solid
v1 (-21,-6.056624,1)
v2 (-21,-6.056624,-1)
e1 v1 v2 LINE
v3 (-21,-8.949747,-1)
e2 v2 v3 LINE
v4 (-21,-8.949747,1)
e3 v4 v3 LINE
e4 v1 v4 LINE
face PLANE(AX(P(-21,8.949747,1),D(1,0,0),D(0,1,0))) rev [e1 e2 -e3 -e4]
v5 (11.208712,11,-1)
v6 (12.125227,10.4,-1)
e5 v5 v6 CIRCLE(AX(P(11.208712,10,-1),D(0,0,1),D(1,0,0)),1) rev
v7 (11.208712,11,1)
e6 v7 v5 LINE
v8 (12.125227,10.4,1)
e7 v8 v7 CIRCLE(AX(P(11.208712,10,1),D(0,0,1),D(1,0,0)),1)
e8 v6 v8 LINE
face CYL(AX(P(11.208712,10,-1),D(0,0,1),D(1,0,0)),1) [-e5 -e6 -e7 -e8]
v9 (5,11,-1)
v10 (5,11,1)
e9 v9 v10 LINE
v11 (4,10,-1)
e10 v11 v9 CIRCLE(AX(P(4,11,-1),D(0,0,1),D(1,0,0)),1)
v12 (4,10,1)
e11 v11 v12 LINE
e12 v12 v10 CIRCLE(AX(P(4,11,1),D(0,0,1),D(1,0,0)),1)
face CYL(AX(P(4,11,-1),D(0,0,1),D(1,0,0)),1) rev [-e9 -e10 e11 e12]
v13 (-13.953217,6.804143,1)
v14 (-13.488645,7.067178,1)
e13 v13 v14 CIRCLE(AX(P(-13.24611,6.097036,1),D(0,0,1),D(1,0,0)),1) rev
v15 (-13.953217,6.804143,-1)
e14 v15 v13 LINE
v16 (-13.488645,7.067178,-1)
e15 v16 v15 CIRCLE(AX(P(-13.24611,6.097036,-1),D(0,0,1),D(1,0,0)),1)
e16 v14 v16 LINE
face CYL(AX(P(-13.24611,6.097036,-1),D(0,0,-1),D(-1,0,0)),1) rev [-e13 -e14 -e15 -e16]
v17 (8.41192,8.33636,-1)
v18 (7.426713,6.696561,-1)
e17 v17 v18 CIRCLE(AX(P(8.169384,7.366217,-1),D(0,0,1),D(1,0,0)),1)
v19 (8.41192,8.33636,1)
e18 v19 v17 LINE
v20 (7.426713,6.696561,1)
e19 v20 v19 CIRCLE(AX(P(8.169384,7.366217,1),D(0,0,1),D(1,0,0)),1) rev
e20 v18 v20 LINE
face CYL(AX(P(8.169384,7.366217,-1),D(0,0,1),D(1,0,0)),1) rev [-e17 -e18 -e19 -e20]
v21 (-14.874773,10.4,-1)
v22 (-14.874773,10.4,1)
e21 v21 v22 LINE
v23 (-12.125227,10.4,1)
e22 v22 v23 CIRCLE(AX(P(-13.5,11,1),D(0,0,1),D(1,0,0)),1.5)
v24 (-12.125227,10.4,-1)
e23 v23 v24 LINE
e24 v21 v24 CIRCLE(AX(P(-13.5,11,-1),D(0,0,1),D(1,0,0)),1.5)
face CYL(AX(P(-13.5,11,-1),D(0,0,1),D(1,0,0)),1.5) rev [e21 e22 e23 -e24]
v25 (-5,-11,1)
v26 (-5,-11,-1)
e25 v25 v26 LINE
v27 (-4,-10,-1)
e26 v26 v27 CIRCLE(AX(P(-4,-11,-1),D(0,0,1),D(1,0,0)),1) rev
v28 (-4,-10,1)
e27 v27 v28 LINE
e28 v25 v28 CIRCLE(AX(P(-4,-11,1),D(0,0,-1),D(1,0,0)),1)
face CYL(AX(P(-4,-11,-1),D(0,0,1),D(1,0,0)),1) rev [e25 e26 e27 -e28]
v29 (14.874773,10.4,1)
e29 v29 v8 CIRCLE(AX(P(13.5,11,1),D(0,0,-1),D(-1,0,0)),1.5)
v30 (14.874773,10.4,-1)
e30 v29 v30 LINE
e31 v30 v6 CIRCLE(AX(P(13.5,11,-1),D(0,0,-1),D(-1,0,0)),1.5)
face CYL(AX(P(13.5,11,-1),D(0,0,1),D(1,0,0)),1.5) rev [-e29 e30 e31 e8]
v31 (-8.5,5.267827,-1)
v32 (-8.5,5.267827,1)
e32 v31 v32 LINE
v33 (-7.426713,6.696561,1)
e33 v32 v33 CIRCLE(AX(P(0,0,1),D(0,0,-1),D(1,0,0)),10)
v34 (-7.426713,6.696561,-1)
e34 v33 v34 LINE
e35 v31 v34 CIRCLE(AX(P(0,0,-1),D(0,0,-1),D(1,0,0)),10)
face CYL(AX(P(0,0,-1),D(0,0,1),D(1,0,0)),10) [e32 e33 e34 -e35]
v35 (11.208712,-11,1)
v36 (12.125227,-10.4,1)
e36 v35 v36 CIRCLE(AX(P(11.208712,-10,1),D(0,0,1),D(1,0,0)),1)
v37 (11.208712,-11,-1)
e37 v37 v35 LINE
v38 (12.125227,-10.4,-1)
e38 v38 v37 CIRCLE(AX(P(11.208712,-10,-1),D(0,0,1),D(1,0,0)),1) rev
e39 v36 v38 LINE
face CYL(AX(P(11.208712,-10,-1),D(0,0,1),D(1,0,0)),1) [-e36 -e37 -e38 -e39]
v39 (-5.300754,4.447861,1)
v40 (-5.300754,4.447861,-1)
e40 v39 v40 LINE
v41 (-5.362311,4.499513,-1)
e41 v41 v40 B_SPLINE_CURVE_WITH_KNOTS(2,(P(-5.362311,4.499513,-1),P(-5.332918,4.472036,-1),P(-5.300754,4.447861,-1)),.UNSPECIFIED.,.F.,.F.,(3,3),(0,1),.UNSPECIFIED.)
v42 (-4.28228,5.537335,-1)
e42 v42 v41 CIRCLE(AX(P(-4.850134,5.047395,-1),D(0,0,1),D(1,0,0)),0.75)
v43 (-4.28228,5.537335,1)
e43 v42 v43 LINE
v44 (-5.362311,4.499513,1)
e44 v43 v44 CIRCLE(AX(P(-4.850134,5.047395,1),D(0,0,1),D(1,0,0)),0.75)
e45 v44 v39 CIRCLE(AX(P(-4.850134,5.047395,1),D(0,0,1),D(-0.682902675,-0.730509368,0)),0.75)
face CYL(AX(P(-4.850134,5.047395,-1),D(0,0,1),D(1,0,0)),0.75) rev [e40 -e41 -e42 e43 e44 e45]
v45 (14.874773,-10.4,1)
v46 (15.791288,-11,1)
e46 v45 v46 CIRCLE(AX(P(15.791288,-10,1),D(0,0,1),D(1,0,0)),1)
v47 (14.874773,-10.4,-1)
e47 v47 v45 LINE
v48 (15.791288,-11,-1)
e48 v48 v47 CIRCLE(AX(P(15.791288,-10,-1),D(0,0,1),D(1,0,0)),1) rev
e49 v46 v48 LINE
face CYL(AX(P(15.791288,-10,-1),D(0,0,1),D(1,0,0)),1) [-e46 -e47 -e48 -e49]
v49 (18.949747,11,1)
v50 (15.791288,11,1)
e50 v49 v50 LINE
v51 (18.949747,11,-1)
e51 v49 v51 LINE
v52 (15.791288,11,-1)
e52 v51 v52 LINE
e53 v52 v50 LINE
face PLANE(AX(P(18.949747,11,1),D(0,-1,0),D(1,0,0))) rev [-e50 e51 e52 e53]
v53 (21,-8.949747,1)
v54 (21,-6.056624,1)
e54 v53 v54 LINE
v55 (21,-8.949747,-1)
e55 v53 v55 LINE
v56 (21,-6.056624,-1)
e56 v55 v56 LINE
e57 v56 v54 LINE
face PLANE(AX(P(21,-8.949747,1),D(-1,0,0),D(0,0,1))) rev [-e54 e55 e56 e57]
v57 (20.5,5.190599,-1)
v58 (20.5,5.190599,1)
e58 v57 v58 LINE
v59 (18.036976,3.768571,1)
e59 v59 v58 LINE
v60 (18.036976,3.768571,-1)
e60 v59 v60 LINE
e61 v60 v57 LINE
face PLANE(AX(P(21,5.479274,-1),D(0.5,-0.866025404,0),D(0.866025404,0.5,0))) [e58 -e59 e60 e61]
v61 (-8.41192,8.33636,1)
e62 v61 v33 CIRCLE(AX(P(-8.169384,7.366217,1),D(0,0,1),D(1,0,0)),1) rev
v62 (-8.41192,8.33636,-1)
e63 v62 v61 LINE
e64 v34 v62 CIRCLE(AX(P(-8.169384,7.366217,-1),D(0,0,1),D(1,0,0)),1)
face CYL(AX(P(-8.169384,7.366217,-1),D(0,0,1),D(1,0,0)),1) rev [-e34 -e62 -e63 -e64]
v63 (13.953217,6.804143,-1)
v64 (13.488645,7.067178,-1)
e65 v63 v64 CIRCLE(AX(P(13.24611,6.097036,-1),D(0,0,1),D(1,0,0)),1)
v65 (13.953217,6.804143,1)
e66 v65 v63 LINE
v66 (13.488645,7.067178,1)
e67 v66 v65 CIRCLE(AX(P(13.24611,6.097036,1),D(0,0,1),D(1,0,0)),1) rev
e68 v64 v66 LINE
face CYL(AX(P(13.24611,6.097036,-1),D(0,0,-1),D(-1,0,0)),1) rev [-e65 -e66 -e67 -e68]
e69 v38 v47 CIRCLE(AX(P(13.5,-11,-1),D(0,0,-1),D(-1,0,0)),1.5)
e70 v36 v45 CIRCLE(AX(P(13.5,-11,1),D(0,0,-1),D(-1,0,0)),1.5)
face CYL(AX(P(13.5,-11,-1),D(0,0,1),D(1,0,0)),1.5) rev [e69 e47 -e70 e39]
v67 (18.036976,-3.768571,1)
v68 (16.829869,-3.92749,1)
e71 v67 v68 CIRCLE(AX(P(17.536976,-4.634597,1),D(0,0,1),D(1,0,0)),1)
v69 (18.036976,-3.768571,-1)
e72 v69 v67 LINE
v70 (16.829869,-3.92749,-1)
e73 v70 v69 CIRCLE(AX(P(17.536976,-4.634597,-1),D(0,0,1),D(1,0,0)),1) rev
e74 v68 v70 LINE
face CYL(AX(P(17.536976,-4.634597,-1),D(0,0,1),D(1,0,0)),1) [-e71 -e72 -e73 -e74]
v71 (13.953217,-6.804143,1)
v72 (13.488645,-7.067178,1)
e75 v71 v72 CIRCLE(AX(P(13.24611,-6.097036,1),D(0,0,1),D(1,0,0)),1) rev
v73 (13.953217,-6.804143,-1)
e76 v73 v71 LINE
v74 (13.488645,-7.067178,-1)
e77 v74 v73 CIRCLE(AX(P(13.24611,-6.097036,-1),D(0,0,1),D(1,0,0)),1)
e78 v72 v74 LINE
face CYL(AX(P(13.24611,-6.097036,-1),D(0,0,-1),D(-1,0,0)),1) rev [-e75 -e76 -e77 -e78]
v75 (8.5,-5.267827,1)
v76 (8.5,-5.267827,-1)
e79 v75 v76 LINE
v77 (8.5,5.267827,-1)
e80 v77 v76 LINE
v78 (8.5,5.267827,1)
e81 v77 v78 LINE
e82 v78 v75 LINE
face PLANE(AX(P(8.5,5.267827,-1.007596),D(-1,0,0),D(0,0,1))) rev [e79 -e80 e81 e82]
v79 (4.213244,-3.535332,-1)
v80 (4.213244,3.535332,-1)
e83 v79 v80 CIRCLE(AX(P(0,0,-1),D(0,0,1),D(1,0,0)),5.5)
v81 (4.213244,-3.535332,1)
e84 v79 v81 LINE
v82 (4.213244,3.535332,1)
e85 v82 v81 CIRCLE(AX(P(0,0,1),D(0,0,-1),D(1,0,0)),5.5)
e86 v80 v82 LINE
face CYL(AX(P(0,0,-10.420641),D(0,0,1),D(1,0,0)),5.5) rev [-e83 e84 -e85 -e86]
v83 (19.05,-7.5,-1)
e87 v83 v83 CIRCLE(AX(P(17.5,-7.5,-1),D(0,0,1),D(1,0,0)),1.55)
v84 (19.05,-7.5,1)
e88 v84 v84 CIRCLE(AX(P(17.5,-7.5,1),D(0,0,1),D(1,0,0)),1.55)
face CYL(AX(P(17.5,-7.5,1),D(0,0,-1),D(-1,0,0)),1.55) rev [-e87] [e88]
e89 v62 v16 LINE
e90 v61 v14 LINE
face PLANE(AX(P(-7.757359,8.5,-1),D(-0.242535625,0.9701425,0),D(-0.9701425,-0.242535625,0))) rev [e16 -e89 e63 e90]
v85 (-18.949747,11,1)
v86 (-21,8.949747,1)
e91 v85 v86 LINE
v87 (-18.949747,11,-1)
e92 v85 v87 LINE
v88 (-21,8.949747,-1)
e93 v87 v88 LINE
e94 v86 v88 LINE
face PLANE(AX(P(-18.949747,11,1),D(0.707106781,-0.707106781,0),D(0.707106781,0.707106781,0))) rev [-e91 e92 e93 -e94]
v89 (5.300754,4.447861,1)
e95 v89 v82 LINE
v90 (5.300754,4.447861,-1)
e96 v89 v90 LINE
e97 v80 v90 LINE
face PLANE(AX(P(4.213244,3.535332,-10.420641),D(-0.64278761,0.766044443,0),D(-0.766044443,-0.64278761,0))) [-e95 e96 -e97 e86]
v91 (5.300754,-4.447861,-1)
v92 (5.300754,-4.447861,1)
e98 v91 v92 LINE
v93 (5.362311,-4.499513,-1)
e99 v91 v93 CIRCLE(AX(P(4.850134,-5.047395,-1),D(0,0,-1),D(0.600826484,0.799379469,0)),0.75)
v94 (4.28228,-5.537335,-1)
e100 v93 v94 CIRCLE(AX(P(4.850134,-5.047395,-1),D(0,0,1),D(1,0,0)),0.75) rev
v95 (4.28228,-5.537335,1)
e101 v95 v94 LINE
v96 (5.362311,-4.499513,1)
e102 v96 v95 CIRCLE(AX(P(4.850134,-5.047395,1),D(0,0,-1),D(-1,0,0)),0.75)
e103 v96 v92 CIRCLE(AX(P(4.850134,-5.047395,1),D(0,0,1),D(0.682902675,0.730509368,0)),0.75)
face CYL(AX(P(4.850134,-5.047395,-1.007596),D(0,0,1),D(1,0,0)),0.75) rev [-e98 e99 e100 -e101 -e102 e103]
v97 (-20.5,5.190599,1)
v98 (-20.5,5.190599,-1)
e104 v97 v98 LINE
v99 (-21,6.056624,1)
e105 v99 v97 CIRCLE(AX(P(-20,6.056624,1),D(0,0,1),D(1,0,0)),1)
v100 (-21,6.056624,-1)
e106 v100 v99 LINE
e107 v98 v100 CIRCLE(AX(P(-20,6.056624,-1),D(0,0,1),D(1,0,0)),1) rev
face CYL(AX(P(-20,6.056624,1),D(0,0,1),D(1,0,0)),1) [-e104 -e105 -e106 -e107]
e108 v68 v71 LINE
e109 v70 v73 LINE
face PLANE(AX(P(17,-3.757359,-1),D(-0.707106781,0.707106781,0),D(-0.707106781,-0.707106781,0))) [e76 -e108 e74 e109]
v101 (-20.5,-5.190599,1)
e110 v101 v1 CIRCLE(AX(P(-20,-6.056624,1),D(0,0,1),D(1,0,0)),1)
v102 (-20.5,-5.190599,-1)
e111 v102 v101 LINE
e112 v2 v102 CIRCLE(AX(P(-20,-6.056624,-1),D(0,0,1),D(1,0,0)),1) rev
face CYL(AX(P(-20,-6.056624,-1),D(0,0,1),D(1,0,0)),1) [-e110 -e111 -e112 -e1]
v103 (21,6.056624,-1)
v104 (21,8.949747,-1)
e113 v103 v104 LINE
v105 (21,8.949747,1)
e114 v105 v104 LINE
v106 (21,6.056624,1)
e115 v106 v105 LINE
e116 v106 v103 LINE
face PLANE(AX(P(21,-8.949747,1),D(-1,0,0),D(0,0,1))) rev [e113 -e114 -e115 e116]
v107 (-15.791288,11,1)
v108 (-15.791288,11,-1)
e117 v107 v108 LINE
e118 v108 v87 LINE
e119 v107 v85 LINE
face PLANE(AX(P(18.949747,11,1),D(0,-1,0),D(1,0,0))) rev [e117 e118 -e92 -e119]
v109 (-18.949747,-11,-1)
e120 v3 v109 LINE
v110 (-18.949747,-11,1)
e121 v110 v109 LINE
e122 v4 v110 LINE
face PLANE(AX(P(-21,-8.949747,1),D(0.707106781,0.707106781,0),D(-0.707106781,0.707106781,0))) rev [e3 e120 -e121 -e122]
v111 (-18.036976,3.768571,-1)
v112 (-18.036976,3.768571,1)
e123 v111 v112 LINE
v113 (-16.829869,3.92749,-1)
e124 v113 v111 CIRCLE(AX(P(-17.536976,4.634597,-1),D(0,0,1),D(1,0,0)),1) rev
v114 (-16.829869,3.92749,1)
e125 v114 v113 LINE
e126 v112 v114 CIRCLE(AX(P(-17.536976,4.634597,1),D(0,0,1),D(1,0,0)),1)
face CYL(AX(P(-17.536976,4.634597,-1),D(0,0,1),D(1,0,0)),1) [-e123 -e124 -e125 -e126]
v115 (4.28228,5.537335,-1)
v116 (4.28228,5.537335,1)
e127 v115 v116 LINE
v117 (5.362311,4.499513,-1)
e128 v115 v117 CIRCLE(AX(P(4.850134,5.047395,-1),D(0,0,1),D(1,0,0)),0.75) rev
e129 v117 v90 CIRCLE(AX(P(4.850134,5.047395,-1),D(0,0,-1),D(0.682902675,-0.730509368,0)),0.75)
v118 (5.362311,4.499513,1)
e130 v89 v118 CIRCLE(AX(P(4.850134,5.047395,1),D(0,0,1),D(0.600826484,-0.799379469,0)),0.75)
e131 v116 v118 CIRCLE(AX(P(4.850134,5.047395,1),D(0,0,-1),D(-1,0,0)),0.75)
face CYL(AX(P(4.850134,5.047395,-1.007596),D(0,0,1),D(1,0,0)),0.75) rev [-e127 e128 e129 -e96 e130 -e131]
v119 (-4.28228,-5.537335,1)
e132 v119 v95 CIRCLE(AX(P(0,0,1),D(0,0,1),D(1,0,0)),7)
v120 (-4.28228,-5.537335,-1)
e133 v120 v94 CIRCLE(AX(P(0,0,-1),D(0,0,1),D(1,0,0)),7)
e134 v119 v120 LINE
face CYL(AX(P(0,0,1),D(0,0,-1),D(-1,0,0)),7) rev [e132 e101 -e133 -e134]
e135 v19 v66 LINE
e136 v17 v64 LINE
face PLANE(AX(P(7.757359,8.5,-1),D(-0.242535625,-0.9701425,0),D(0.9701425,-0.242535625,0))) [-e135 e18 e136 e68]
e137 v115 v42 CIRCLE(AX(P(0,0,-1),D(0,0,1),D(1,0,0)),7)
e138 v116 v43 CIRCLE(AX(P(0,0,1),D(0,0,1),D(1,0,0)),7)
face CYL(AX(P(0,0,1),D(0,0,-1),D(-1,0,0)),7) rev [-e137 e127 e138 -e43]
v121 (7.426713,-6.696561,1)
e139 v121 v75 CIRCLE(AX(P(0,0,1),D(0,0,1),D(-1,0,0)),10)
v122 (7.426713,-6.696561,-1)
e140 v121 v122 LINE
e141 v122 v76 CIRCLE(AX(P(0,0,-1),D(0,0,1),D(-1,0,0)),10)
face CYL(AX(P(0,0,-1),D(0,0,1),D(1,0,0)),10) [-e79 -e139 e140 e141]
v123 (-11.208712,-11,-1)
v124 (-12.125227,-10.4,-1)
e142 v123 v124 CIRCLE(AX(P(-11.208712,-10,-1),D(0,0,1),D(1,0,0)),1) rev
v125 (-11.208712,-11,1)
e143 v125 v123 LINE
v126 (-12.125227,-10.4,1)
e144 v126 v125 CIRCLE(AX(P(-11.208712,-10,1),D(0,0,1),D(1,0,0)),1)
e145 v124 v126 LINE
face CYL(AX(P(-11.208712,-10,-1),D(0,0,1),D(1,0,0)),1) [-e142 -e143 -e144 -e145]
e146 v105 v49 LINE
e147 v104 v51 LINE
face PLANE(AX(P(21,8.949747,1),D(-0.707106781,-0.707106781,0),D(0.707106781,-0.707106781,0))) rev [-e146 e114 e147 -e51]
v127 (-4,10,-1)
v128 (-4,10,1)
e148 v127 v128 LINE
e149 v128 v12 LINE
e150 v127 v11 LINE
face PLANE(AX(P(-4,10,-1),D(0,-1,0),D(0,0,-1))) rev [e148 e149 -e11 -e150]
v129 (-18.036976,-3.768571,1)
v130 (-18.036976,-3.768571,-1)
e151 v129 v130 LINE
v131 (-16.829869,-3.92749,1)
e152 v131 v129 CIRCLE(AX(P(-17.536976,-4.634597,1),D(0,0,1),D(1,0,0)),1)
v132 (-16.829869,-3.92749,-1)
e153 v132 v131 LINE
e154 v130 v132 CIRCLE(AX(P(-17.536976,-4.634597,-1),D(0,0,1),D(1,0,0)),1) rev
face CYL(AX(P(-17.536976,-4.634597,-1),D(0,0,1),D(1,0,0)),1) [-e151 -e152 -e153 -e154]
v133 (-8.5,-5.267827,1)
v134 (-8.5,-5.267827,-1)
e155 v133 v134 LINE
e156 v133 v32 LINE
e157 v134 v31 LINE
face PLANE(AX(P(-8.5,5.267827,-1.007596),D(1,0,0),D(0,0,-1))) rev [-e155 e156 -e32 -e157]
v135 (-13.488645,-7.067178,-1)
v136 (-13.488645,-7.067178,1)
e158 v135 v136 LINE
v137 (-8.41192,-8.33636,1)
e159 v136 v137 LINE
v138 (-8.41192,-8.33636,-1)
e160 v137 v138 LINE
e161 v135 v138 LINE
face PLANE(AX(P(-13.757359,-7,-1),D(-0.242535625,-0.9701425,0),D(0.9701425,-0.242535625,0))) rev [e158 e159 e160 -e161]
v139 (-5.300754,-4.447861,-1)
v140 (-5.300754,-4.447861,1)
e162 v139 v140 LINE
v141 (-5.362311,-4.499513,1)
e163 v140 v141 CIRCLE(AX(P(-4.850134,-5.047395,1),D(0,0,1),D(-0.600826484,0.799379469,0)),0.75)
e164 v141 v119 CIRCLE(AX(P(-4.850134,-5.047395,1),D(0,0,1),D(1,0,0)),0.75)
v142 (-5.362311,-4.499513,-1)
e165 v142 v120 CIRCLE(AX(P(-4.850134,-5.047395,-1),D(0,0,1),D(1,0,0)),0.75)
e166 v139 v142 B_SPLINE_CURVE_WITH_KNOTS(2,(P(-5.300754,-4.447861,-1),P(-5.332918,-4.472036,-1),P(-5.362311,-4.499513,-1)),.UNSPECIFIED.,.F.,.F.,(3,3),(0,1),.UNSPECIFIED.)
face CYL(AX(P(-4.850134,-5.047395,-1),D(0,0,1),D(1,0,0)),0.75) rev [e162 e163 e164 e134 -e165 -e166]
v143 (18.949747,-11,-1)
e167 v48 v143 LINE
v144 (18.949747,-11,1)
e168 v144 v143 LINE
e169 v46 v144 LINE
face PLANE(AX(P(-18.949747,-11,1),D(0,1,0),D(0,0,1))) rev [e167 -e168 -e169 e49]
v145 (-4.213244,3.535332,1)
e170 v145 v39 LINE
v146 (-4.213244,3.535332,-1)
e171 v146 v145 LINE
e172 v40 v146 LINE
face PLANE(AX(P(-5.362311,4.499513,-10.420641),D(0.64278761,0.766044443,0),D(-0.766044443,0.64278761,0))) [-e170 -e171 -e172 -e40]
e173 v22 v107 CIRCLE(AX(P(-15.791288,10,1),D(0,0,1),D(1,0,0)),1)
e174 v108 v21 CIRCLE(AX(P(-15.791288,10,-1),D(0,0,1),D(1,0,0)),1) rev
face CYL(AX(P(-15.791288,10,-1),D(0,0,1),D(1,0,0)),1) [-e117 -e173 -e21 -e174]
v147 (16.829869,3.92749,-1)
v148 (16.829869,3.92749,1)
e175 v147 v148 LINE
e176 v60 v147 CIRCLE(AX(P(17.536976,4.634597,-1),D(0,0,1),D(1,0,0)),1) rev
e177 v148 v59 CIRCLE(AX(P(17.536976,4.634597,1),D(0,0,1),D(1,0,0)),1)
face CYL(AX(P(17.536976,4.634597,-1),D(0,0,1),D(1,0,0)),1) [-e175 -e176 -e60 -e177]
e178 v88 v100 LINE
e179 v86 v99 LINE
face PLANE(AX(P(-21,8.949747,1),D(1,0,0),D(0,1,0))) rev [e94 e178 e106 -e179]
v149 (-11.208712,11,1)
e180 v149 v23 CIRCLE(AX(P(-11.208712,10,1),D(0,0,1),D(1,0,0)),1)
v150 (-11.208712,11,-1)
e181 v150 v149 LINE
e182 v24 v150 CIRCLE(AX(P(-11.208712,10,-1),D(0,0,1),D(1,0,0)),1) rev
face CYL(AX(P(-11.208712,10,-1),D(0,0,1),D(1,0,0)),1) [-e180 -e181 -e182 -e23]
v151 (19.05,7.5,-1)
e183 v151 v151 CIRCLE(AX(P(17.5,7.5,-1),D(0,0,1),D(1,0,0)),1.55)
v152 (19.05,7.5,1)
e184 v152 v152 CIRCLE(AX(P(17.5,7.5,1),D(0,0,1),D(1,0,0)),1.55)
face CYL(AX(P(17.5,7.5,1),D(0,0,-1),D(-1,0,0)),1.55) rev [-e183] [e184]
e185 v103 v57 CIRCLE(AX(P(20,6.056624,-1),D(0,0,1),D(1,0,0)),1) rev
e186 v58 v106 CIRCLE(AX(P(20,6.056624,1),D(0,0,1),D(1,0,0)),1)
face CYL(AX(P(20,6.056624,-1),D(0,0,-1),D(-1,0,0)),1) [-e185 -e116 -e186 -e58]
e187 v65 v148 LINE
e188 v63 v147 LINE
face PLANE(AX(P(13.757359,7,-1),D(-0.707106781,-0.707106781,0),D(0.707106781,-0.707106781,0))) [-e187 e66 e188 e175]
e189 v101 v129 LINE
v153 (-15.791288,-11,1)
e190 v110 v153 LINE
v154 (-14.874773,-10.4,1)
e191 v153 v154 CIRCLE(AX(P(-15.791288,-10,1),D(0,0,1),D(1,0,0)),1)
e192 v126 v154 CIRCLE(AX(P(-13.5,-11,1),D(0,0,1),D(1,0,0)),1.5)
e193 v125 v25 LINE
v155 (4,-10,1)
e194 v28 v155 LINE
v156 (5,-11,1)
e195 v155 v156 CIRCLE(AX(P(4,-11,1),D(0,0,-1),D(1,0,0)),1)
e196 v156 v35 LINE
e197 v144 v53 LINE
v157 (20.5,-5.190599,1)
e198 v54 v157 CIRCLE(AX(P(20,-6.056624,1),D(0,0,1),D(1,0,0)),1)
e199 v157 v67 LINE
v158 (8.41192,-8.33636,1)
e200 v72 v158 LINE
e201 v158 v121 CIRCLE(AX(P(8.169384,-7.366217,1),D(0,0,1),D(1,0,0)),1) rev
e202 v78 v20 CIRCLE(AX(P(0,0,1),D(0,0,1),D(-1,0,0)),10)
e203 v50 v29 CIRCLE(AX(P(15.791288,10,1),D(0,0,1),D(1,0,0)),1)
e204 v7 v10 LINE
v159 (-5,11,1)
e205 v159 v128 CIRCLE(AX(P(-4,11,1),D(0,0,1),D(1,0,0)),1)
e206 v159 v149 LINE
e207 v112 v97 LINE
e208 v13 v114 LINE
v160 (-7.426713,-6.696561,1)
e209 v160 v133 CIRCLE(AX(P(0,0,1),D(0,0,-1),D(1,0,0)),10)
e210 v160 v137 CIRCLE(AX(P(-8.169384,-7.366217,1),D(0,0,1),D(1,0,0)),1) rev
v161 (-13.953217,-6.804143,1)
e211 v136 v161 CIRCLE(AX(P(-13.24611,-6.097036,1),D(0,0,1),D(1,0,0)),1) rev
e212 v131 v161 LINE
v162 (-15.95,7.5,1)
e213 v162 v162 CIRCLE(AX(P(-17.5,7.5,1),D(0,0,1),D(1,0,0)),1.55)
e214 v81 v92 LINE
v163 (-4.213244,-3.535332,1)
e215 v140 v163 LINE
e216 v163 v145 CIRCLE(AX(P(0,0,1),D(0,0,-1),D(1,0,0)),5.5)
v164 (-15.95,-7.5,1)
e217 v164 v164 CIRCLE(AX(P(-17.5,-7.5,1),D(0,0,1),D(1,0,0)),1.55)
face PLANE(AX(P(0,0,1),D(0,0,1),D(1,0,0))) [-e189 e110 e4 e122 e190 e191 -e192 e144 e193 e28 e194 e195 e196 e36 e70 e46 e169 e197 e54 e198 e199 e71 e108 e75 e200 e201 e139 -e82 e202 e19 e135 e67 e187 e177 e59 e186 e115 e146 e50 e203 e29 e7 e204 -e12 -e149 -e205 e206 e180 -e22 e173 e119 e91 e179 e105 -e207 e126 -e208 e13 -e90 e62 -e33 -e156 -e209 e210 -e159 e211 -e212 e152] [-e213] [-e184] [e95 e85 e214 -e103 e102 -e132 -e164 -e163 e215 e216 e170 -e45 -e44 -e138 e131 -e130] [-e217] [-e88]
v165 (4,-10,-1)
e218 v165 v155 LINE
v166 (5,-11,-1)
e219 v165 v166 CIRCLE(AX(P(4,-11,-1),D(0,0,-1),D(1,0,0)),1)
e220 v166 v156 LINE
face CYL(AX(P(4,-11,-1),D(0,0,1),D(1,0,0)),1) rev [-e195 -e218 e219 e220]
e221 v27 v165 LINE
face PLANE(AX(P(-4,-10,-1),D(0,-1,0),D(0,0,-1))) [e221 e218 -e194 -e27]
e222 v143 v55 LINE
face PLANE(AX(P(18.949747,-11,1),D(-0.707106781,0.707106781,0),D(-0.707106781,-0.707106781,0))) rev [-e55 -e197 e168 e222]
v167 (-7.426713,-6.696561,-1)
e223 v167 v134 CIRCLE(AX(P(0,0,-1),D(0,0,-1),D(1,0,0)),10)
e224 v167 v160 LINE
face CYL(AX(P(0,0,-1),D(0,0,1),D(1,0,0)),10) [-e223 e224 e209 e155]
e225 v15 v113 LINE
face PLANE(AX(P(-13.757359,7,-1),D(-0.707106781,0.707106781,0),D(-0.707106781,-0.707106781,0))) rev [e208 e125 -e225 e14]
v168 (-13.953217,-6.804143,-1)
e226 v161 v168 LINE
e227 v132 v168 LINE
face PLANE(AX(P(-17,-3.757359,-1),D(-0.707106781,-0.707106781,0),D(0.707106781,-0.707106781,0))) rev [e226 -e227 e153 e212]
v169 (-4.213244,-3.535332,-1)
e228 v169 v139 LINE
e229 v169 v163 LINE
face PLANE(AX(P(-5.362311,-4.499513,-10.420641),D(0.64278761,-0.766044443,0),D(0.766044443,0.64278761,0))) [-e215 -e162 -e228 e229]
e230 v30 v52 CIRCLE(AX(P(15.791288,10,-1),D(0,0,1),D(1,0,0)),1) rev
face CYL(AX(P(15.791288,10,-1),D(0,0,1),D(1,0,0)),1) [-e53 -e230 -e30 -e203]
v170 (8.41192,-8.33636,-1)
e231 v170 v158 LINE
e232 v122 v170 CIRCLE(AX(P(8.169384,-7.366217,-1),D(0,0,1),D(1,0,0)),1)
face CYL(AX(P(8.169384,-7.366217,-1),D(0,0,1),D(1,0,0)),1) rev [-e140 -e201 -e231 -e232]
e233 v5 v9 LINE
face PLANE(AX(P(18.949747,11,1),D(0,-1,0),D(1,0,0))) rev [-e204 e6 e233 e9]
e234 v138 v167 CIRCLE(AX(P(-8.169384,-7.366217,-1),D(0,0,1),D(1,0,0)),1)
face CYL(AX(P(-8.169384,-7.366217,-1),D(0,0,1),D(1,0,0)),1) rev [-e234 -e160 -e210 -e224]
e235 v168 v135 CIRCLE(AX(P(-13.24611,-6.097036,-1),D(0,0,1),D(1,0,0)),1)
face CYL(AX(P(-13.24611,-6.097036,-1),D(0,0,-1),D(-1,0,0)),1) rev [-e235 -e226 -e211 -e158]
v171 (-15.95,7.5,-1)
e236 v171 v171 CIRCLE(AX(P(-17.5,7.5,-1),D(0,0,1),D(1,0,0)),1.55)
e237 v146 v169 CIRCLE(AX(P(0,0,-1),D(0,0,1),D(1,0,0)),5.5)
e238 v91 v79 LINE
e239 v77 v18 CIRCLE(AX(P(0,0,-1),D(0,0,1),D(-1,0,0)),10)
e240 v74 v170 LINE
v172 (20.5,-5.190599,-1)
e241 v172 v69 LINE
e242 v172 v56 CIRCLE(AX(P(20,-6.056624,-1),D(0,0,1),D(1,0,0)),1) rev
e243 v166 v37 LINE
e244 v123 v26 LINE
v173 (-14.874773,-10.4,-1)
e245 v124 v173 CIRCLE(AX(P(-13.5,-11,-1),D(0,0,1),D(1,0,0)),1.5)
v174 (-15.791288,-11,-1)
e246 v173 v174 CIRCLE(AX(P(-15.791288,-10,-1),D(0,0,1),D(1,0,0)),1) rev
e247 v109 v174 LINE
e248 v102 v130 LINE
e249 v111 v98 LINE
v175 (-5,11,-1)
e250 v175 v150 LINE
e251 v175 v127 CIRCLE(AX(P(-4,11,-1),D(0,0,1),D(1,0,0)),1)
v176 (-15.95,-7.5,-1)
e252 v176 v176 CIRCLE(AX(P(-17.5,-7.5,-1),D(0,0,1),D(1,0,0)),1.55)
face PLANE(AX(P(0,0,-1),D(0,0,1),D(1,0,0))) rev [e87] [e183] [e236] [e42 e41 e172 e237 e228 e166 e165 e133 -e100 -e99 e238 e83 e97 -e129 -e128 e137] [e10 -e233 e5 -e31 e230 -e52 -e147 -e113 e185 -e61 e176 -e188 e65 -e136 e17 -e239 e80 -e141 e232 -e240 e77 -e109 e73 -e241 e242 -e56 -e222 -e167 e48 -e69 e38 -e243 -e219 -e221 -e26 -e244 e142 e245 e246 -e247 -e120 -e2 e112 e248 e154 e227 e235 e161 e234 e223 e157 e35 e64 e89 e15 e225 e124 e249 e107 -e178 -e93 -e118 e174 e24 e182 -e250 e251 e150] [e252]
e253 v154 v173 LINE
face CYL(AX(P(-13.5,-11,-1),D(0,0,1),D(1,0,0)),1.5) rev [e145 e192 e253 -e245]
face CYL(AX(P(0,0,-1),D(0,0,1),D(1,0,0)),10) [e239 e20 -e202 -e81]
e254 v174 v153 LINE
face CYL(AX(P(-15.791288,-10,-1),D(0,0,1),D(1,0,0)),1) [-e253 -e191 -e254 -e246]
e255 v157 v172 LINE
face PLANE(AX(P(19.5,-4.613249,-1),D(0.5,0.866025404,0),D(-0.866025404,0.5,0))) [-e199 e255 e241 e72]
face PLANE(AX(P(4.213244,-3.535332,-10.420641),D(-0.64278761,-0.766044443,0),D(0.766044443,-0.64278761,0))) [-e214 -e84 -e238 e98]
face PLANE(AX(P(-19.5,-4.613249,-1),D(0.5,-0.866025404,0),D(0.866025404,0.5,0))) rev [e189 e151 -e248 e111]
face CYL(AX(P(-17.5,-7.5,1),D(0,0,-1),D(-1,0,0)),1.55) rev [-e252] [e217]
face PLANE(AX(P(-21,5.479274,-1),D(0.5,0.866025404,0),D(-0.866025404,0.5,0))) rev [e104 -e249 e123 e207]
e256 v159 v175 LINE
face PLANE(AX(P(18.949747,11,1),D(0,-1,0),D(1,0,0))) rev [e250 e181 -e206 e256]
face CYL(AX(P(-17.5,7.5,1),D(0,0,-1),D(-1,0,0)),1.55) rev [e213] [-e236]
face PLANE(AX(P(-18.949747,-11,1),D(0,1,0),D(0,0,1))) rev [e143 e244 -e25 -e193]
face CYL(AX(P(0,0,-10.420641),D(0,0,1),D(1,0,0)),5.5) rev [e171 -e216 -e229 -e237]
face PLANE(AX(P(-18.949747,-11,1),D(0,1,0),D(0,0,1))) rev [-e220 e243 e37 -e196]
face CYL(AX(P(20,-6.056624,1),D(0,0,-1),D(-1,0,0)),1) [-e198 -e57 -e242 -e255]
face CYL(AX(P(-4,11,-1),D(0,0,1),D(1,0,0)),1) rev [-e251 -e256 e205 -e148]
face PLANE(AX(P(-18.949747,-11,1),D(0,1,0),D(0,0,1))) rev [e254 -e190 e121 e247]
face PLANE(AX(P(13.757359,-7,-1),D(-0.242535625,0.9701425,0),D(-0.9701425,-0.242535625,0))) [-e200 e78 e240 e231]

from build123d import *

# Parameters (mm, degrees)
SKETCH_1_R             = 1.55
SKETCH_1_R_2           = 7
EXTRUDE_1_DEPTH        = 1
CUT_EXTRUDE_1_DEPTH    = 24.790754507
FILLET_1_R             = 1
SKETCH_3_R             = 1.5
CUT_EXTRUDE_2_DEPTH    = 24.790754507
FILLET_2_R             = 1
FILLET_1_OF_MIRROR_1_R = 1
FILLET_2_OF_MIRROR_1_R = 1
CUT_EXTRUDE_3_DEPTH    = 24.790754507
FILLET_3_R             = 1
EXTRUDE_START          = -2
EXTRUDE_2_DEPTH        = 2
SKETCH_6_R             = 0.75
CUT_EXTRUDE_4_DEPTH    = 24.790754507
CUT_EXTRUDE_5_DEPTH    = 24.790754507
CUT_EXTRUDE_6_DEPTH    = 24.790754507
FILLET_4_R             = 1


with BuildPart() as part:
    # 草图1 → 凸台-拉伸1 (new, symmetric)
    with BuildSketch(Plane.XY):
        Polygon((-21, 8.949747468), (-21, -8.949747468), (-18.949747468, -11), (18.949747468, -11), (21, -8.949747468), (21, 8.949747468), (18.949747468, 11), (-18.949747468, 11), align=None)
        with Locations((-17.5, 7.5)):
            Circle(SKETCH_1_R, mode=Mode.SUBTRACT)
        with Locations((-17.5, -7.5)):
            Circle(SKETCH_1_R, mode=Mode.SUBTRACT)
        with Locations((17.5, -7.5)):
            Circle(SKETCH_1_R, mode=Mode.SUBTRACT)
        with Locations((17.5, 7.5)):
            Circle(SKETCH_1_R, mode=Mode.SUBTRACT)
        Circle(SKETCH_1_R_2, mode=Mode.SUBTRACT)
    extrude(amount=EXTRUDE_1_DEPTH, both=True)

    # 草图2 → 切除-拉伸1 (cut, through all)
    with BuildSketch(Plane.XY.offset(1)):
        Polygon((-21, 5.479274058), (-19.5, 4.613248654), (-19.5, -4.613248654), (-21, -5.479274058), align=None)
        with BuildLine():
            Line((-17, 3.757359313), (-17, -3.757359313))
            Line((-17, -3.757359313), (-13.757359313, -7))
            Line((-13.757359313, -7), (-7.757359313, -8.5))
            Line((-7.757359313, -8.5), (-5.267826876, -8.5))
            ThreePointArc((-5.267826876, -8.5), (-10, 0), (-5.267826876, 8.5))
            Line((-5.267826876, 8.5), (-7.757359313, 8.5))
            Line((-7.757359313, 8.5), (-13.757359313, 7))
            Line((-13.757359313, 7), (-17, 3.757359313))
        make_face()
    cut_extrude_1 = extrude(amount=-CUT_EXTRUDE_1_DEPTH, mode=Mode.SUBTRACT)

    # 圆角1
    # the kernel refuses this fillet: 1 mm, written as the material it adds along each edge
    with BuildSketch(Plane(origin=(-19.5, 4.613248654, 1), x_dir=(-0.8660254037844358, 0.5000000000000049, 0), z_dir=(0, 0, -1))) as fillet_1_piece_1:
        with BuildLine():
            CenterArc((FILLET_1_R * 0.57735026919, -FILLET_1_R), FILLET_1_R, 90, 60)
            Line((-FILLET_1_R * 0.288675134595, -FILLET_1_R * 0.5), (-FILLET_1_R * 0.30599564267, -FILLET_1_R * 0.49))
            Line((-FILLET_1_R * 0.30599564267, -FILLET_1_R * 0.49), (-FILLET_1_R * 0.0115470053838, FILLET_1_R * 0.02))
            Line((-FILLET_1_R * 0.0115470053838, FILLET_1_R * 0.02), (FILLET_1_R * 0.57735026919, FILLET_1_R * 0.02))
            Line((FILLET_1_R * 0.57735026919, FILLET_1_R * 0.02), (FILLET_1_R * 0.57735026919, 0))
        make_face()
    extrude(amount=2)
    with BuildSketch(Plane(origin=(-19.5, -4.613248654, 1), x_dir=(-0.8660254037844358, -0.5000000000000049, 0), z_dir=(0, 0, -1))) as fillet_1_piece_2:
        with BuildLine():
            CenterArc((FILLET_1_R * 0.57735026919, FILLET_1_R), FILLET_1_R, 210, 60)
            Line((-FILLET_1_R * 0.288675134595, FILLET_1_R * 0.5), (-FILLET_1_R * 0.30599564267, FILLET_1_R * 0.49))
            Line((-FILLET_1_R * 0.30599564267, FILLET_1_R * 0.49), (-FILLET_1_R * 0.0115470053838, -FILLET_1_R * 0.02))
            Line((-FILLET_1_R * 0.0115470053838, -FILLET_1_R * 0.02), (FILLET_1_R * 0.57735026919, -FILLET_1_R * 0.02))
            Line((FILLET_1_R * 0.57735026919, -FILLET_1_R * 0.02), (FILLET_1_R * 0.57735026919, 0))
        make_face()
    extrude(amount=2)
    with BuildSketch(Plane(origin=(-5.267826876, -8.5, 1), x_dir=(-1, 0, 0), z_dir=(0, 0, -1))) as fillet_1_piece_3:
        with BuildLine():
            CenterArc((2.747285214, 0.966210901), FILLET_1_R, 136.773049556, 118.290188871)
            Line((2.01863866, 1.651100819), (2.004065729, 1.664798618))
            ThreePointArc((2.004065729, 1.664798618), (1.050711081, 0.774944785), (-0.010535654, 0.017))
            Line((-0.010535654, 0.017), (0, -0.02))
            ThreePointArc((0, -0.02), (1.244766218, -0.02), (2.484377381, -0.019324218))
            Line((2.484377381, -0.019324218), (2.489532436, 0))
        make_face()
    extrude(amount=2)
    with BuildSketch(Plane(origin=(-13.757359313, -7, 1), x_dir=(-0.7071067811865476, 0.7071067811865476, 0), z_dir=(0, 0, -1)), Plane(origin=(-13.757359313, 7, 1), x_dir=(0.9701425001453319, 0.24253562503633297, 0), z_dir=(0, 0, -1))) as fillet_1_piece_4:
        with BuildLine():
            CenterArc((FILLET_1_R * 0.276983964948, FILLET_1_R), FILLET_1_R, 239.036243468, 30.963756532)
            Line((-FILLET_1_R * 0.237511790479, FILLET_1_R * 0.142507074287), (-FILLET_1_R * 0.247801705588, FILLET_1_R * 0.125357215773))
            Line((-FILLET_1_R * 0.247801705588, FILLET_1_R * 0.125357215773), (-FILLET_1_R * 0.00553967929897, -FILLET_1_R * 0.02))
            Line((-FILLET_1_R * 0.00553967929897, -FILLET_1_R * 0.02), (FILLET_1_R * 0.276983964948, -FILLET_1_R * 0.02))
            Line((FILLET_1_R * 0.276983964948, -FILLET_1_R * 0.02), (FILLET_1_R * 0.276983964948, 0))
        make_face()
    extrude(amount=2)
    with BuildSketch(Plane(origin=(-17, -3.757359313, 1), x_dir=(0, 1, 0), z_dir=(0, 0, -1))) as fillet_1_piece_5:
        with BuildLine():
            CenterArc((FILLET_1_R * 0.414213562373, FILLET_1_R), FILLET_1_R, 225, 45)
            Line((-FILLET_1_R * 0.292893218813, FILLET_1_R * 0.292893218813), (-FILLET_1_R * 0.307035354437, FILLET_1_R * 0.27875108319))
            Line((-FILLET_1_R * 0.307035354437, FILLET_1_R * 0.27875108319), (-FILLET_1_R * 0.00828427124746, -FILLET_1_R * 0.02))
            Line((-FILLET_1_R * 0.00828427124746, -FILLET_1_R * 0.02), (FILLET_1_R * 0.414213562373, -FILLET_1_R * 0.02))
            Line((FILLET_1_R * 0.414213562373, -FILLET_1_R * 0.02), (FILLET_1_R * 0.414213562373, 0))
        make_face()
    extrude(amount=2)
    with BuildSketch(Plane(origin=(-17, 3.757359313, 1), x_dir=(0, -1, 0), z_dir=(0, 0, -1))) as fillet_1_piece_6:
        with BuildLine():
            CenterArc((FILLET_1_R * 0.414213562373, -FILLET_1_R), FILLET_1_R, 90, 45)
            Line((-FILLET_1_R * 0.292893218813, -FILLET_1_R * 0.292893218813), (-FILLET_1_R * 0.307035354437, -FILLET_1_R * 0.27875108319))
            Line((-FILLET_1_R * 0.307035354437, -FILLET_1_R * 0.27875108319), (-FILLET_1_R * 0.00828427124746, FILLET_1_R * 0.02))
            Line((-FILLET_1_R * 0.00828427124746, FILLET_1_R * 0.02), (FILLET_1_R * 0.414213562373, FILLET_1_R * 0.02))
            Line((FILLET_1_R * 0.414213562373, FILLET_1_R * 0.02), (FILLET_1_R * 0.414213562373, 0))
        make_face()
    extrude(amount=2)
    with BuildSketch(Plane(origin=(-5.267826876, 8.5, 1), x_dir=(-0.7740536287886277, -0.6331200358219264, 0), z_dir=(0, 0, -1))) as fillet_1_piece_7:
        with BuildLine():
            CenterArc((2.738273569, 0.991462259), FILLET_1_R, 144.217451659, 118.290188871)
            Line((1.927031616, 1.576172865), (1.910806777, 1.587867077))
            ThreePointArc((1.910806777, 1.587867077), (0.950853407, 0.803567505), (-0.012662401, 0.015481073))
            Line((-0.012662401, 0.015481073), (0.00260788, -0.019829245))
            ThreePointArc((0.00260788, -0.019829245), (1.303939795, 0.065377415), (2.60527171, -0.019829245))
            Line((2.60527171, -0.019829245), (2.60787959, 0))
        make_face()
    extrude(amount=2)

    # 草图3 → 切除-拉伸2 (cut, through all)
    with BuildSketch(Plane.XY.offset(1)):
        with Locations((-13.5, 11)):
            Circle(SKETCH_3_R)
        with Locations((-13.5, -11)):
            Circle(SKETCH_3_R)
    cut_extrude_2 = extrude(amount=-CUT_EXTRUDE_2_DEPTH, mode=Mode.SUBTRACT)

    # 圆角2
    fillet_2_edges = [part.edges().sort_by_distance(p)[0] for p in [
        (-15, 11, 0),
        (-12, 11, 0),
        (-12, -11, 0),
        (-15, -11, 0),
    ]]
    fillet(fillet_2_edges, radius=FILLET_2_R)

    # 镜向1: 切除-拉伸1, 切除-拉伸2 across plane
    add(cut_extrude_1.mirror(Plane(origin=(0, 0, 0), x_dir=(0, 0, 1), z_dir=(1, 0, 0))), mode=Mode.SUBTRACT)
    add(cut_extrude_2.mirror(Plane(origin=(0, 0, 0), x_dir=(0, 0, 1), z_dir=(1, 0, 0))), mode=Mode.SUBTRACT)

    # 圆角1 of 镜向1
    # the kernel refuses this fillet: 1 mm, written as the material it adds along each edge
    with BuildSketch(Plane(origin=(19.5, 4.613248654, 1), x_dir=(0.866025403784436, 0.5000000000000044, 0), z_dir=(0, 0, -1)), Plane(origin=(19.5, -4.613248654, 1), x_dir=(0, 1, 0), z_dir=(0, 0, -1))) as fillet_1_of_mirror_1_piece_1:
        with BuildLine():
            CenterArc((FILLET_1_OF_MIRROR_1_R * 0.57735026919, FILLET_1_OF_MIRROR_1_R), FILLET_1_OF_MIRROR_1_R, 210, 60)
            Line((-FILLET_1_OF_MIRROR_1_R * 0.288675134595, FILLET_1_OF_MIRROR_1_R * 0.5), (-FILLET_1_OF_MIRROR_1_R * 0.305995642671, FILLET_1_OF_MIRROR_1_R * 0.49))
            Line((-FILLET_1_OF_MIRROR_1_R * 0.305995642671, FILLET_1_OF_MIRROR_1_R * 0.49), (-FILLET_1_OF_MIRROR_1_R * 0.0115470053838, -FILLET_1_OF_MIRROR_1_R * 0.02))
            Line((-FILLET_1_OF_MIRROR_1_R * 0.0115470053838, -FILLET_1_OF_MIRROR_1_R * 0.02), (FILLET_1_OF_MIRROR_1_R * 0.57735026919, -FILLET_1_OF_MIRROR_1_R * 0.02))
            Line((FILLET_1_OF_MIRROR_1_R * 0.57735026919, -FILLET_1_OF_MIRROR_1_R * 0.02), (FILLET_1_OF_MIRROR_1_R * 0.57735026919, 0))
        make_face()
    extrude(amount=2)
    with BuildSketch(Plane(origin=(5.267826876, -8.5, 1), x_dir=(0.7740536287886277, 0.6331200358219264, 0), z_dir=(0, 0, -1))) as fillet_1_of_mirror_1_piece_2:
        with BuildLine():
            CenterArc((2.738273569, 0.991462259), FILLET_1_OF_MIRROR_1_R, 144.217451659, 118.290188871)
            Line((1.927031616, 1.576172865), (1.910806777, 1.587867077))
            ThreePointArc((1.910806777, 1.587867077), (0.950853407, 0.803567505), (-0.012662401, 0.015481073))
            Line((-0.012662401, 0.015481073), (0.00260788, -0.019829245))
            ThreePointArc((0.00260788, -0.019829245), (1.303939795, 0.065377415), (2.60527171, -0.019829245))
            Line((2.60527171, -0.019829245), (2.60787959, 0))
        make_face()
    extrude(amount=2)
    with BuildSketch(Plane(origin=(13.757359313, -7, 1), x_dir=(0.7071067811865476, 0.7071067811865476, 0), z_dir=(0, 0, -1))) as fillet_1_of_mirror_1_piece_3:
        with BuildLine():
            CenterArc((FILLET_1_OF_MIRROR_1_R * 0.276983964948, -FILLET_1_OF_MIRROR_1_R), FILLET_1_OF_MIRROR_1_R, 90, 30.963756532)
            Line((-FILLET_1_OF_MIRROR_1_R * 0.237511790479, -FILLET_1_OF_MIRROR_1_R * 0.142507074287), (-FILLET_1_OF_MIRROR_1_R * 0.247801705588, -FILLET_1_OF_MIRROR_1_R * 0.125357215773))
            Line((-FILLET_1_OF_MIRROR_1_R * 0.247801705588, -FILLET_1_OF_MIRROR_1_R * 0.125357215773), (-FILLET_1_OF_MIRROR_1_R * 0.00553967929897, FILLET_1_OF_MIRROR_1_R * 0.02))
            Line((-FILLET_1_OF_MIRROR_1_R * 0.00553967929897, FILLET_1_OF_MIRROR_1_R * 0.02), (FILLET_1_OF_MIRROR_1_R * 0.276983964948, FILLET_1_OF_MIRROR_1_R * 0.02))
            Line((FILLET_1_OF_MIRROR_1_R * 0.276983964948, FILLET_1_OF_MIRROR_1_R * 0.02), (FILLET_1_OF_MIRROR_1_R * 0.276983964948, 0))
        make_face()
    extrude(amount=2)
    with BuildSketch(Plane(origin=(17, -3.757359313, 1), x_dir=(0, 1, 0), z_dir=(0, 0, -1)), Plane(origin=(17, 3.757359313, 1), x_dir=(-0.7071067811865465, 0.7071067811865486, 0), z_dir=(0, 0, -1))) as fillet_1_of_mirror_1_piece_4:
        with BuildLine():
            CenterArc((FILLET_1_OF_MIRROR_1_R * 0.414213562373, -FILLET_1_OF_MIRROR_1_R), FILLET_1_OF_MIRROR_1_R, 90, 45)
            Line((-FILLET_1_OF_MIRROR_1_R * 0.292893218813, -FILLET_1_OF_MIRROR_1_R * 0.292893218813), (-FILLET_1_OF_MIRROR_1_R * 0.307035354437, -FILLET_1_OF_MIRROR_1_R * 0.27875108319))
            Line((-FILLET_1_OF_MIRROR_1_R * 0.307035354437, -FILLET_1_OF_MIRROR_1_R * 0.27875108319), (-FILLET_1_OF_MIRROR_1_R * 0.00828427124746, FILLET_1_OF_MIRROR_1_R * 0.02))
            Line((-FILLET_1_OF_MIRROR_1_R * 0.00828427124746, FILLET_1_OF_MIRROR_1_R * 0.02), (FILLET_1_OF_MIRROR_1_R * 0.414213562373, FILLET_1_OF_MIRROR_1_R * 0.02))
            Line((FILLET_1_OF_MIRROR_1_R * 0.414213562373, FILLET_1_OF_MIRROR_1_R * 0.02), (FILLET_1_OF_MIRROR_1_R * 0.414213562373, 0))
        make_face()
    extrude(amount=2)
    with BuildSketch(Plane(origin=(13.757359313, 7, 1), x_dir=(0.7071067811865491, -0.7071067811865459, 0), z_dir=(0, 0, -1))) as fillet_1_of_mirror_1_piece_5:
        with BuildLine():
            CenterArc((FILLET_1_OF_MIRROR_1_R * 0.276983964948, FILLET_1_OF_MIRROR_1_R), FILLET_1_OF_MIRROR_1_R, 239.036243468, 30.963756532)
            Line((-FILLET_1_OF_MIRROR_1_R * 0.237511790479, FILLET_1_OF_MIRROR_1_R * 0.142507074287), (-FILLET_1_OF_MIRROR_1_R * 0.247801705588, FILLET_1_OF_MIRROR_1_R * 0.125357215773))
            Line((-FILLET_1_OF_MIRROR_1_R * 0.247801705588, FILLET_1_OF_MIRROR_1_R * 0.125357215773), (-FILLET_1_OF_MIRROR_1_R * 0.00553967929897, -FILLET_1_OF_MIRROR_1_R * 0.02))
            Line((-FILLET_1_OF_MIRROR_1_R * 0.00553967929897, -FILLET_1_OF_MIRROR_1_R * 0.02), (FILLET_1_OF_MIRROR_1_R * 0.276983964948, -FILLET_1_OF_MIRROR_1_R * 0.02))
            Line((FILLET_1_OF_MIRROR_1_R * 0.276983964948, -FILLET_1_OF_MIRROR_1_R * 0.02), (FILLET_1_OF_MIRROR_1_R * 0.276983964948, 0))
        make_face()
    extrude(amount=2)
    with BuildSketch(Plane(origin=(5.267826876, 8.5, 1), x_dir=(1, 0, 0), z_dir=(0, 0, -1))) as fillet_1_of_mirror_1_piece_6:
        with BuildLine():
            CenterArc((2.747285214, 0.966210901), FILLET_1_OF_MIRROR_1_R, 136.773049556, 118.290188871)
            Line((2.01863866, 1.651100819), (2.004065729, 1.664798618))
            ThreePointArc((2.004065729, 1.664798618), (1.050711081, 0.774944785), (-0.010535654, 0.017))
            Line((-0.010535654, 0.017), (0, -0.02))
            ThreePointArc((0, -0.02), (1.244766218, -0.02), (2.484377381, -0.019324218))
            Line((2.484377381, -0.019324218), (2.489532436, 0))
        make_face()
    extrude(amount=2)

    # 圆角2 of 镜向1
    fillet_2_of_mirror_1_edges = [part.edges().sort_by_distance(p)[0] for p in [
        (15, 11, 0),
        (12, 11, 0),
        (12, -11, 0),
        (15, -11, 0),
    ]]
    fillet(fillet_2_of_mirror_1_edges, radius=FILLET_2_OF_MIRROR_1_R)

    # 草图4 → 切除-拉伸3 (cut, through all)
    with BuildSketch(Plane.XY.offset(1)):
        with BuildLine():
            Line((-4, 12), (4, 12))
            ThreePointArc((4, 12), (5, 11), (4, 10))
            Line((4, 10), (-4, 10))
            ThreePointArc((-4, 10), (-5, 11), (-4, 12))
        make_face()
    cut_extrude_3 = extrude(amount=-CUT_EXTRUDE_3_DEPTH, mode=Mode.SUBTRACT)

    # 镜向2: 切除-拉伸3 across plane
    add(cut_extrude_3.mirror(Plane.ZX), mode=Mode.SUBTRACT)

    # 圆角3
    # the kernel refuses this fillet: 1 mm, written as the material it adds along each edge
    with BuildSketch(Plane(origin=(7.757359313, 8.5, 1), x_dir=(-0.18033615776387593, -0.9836050377071899, 0), z_dir=(0, 0, -1)), Plane(origin=(-7.757359313, -8.5, 1), x_dir=(0.18033615776387713, 0.9836050377071898, 0), z_dir=(0, 0, -1))) as fillet_3_piece_1:
        with BuildLine():
            CenterArc((1.040891337, -0.609732036), FILLET_3_R, 37.570129933, 146.076772884)
            Line((0.042916344, -0.673339527), (-0.056881155, -0.679700277))
            Line((-0.056881155, -0.679700277), (-0.099797499, -0.006360749))
            Line((-0.099797499, -0.006360749), (-0.090388776, 0.042776969))
            ThreePointArc((-0.090388776, 0.042776969), (1.789456507, 0.224739313), (1.912759723, 0.060973204))
            Line((1.912759723, 0.060973204), (1.833498961, 0))
        make_face()
    extrude(amount=2)
    with BuildSketch(Plane(origin=(7.757359313, -8.5, 1), x_dir=(-0.18033615776387926, 0.9836050377071893, 0), z_dir=(0, 0, -1))) as fillet_3_piece_2:
        with BuildLine():
            CenterArc((1.040891337, 0.609732036), FILLET_3_R, 176.353097183, 146.076772884)
            Line((0.042916344, 0.673339527), (-0.056881155, 0.679700277))
            Line((-0.056881155, 0.679700277), (-0.099797499, 0.006360749))
            Line((-0.099797499, 0.006360749), (-0.090388776, -0.042776969))
            ThreePointArc((-0.090388776, -0.042776969), (1.789456507, -0.224739313), (1.912759723, -0.060973204))
            Line((1.912759723, -0.060973204), (1.833498961, 0))
        make_face()
    extrude(amount=2)
    with BuildSketch(Plane(origin=(-7.757359313, 8.5, 1), x_dir=(-0.9701425001453321, -0.24253562503633236, 0), z_dir=(0, 0, -1))) as fillet_3_piece_3:
        with BuildLine():
            CenterArc((0.674705811, -1), FILLET_3_R, 90, 146.076772884)
            Line((0.11662427, -1.829786113), (0.060816116, -1.912764724))
            ThreePointArc((0.060816116, -1.912764724), (-0.110461375, -1.80012795), (-0.048439749, 0.087484803))
            Line((-0.048439749, 0.087484803), (0, 0.1))
            Line((0, 0.1), (0.674705811, 0.1))
            Line((0.674705811, 0.1), (0.674705811, 0))
        make_face()
    extrude(amount=2)

    # 草图5 → 凸台-拉伸2 (add)
    with BuildSketch(Plane.XY.offset(1).offset(EXTRUDE_START)):
        with BuildLine():
            Line((-5.362311102, 4.499513268), (-4.213244437, 3.535331853))
            ThreePointArc((-4.213244437, 3.535331853), (-5.5, 0), (-4.213244437, -3.535331853))
            Line((-4.213244437, -3.535331853), (-5.362311102, -4.499513268))
            ThreePointArc((-5.362311102, -4.499513268), (-7, 0), (-5.362311102, 4.499513268))
        make_face()
        with BuildLine():
            Line((4.213244437, 3.535331853), (5.362311102, 4.499513268))
            ThreePointArc((5.362311102, 4.499513268), (7, 0), (5.362311102, -4.499513268))
            Line((5.362311102, -4.499513268), (4.213244437, -3.535331853))
            ThreePointArc((4.213244437, -3.535331853), (5.5, 0), (4.213244437, 3.535331853))
        make_face()
    extrude(amount=EXTRUDE_2_DEPTH)

    # 草图6 → 切除-拉伸4 (cut, through all)
    with BuildSketch(Plane.XY.offset(1)):
        with Locations((-4.850134096, 5.047395294)):
            Circle(SKETCH_6_R)
        with Locations((-4.850134096, -5.047395294)):
            Circle(SKETCH_6_R)
    cut_extrude_4 = extrude(amount=-CUT_EXTRUDE_4_DEPTH, mode=Mode.SUBTRACT)

    # 镜向3: 切除-拉伸4 across plane
    add(cut_extrude_4.mirror(Plane(origin=(0, 0, 0), x_dir=(0, 0, 1), z_dir=(1, 0, 0))), mode=Mode.SUBTRACT)

    # 草图7 → 切除-拉伸5 (cut, through all)
    with BuildSketch(Plane.XY.offset(1)):
        with BuildLine():
            Line((-8.5, 5.267826876), (-8.5, -5.267826876))
            ThreePointArc((-8.5, -5.267826876), (-10, 0), (-8.5, 5.267826876))
        make_face()
        with BuildLine():
            Line((8.5, 5.267826876), (8.5, -5.267826876))
            ThreePointArc((8.5, -5.267826876), (10, 0), (8.5, 5.267826876))
        make_face()
    extrude(amount=-CUT_EXTRUDE_5_DEPTH, mode=Mode.SUBTRACT)

    # 草图8 → 切除-拉伸6 (cut, through all)
    with BuildSketch(Plane.XY.offset(1)):
        with BuildLine():
            Line((-20, 4.901923789), (-17.37245141, 3.384907903))
            Line((-17.37245141, 3.384907903), (-16.707106781, 4.050252532))
            ThreePointArc((-16.707106781, 4.050252532), (-16.923879533, 3.725829183), (-17, 3.343145751))
            Line((-17, 3.343145751), (-17, -3.343145751))
            ThreePointArc((-17, -3.343145751), (-16.923879533, -3.725829183), (-16.707106781, -4.050252532))
            Line((-16.707106781, -4.050252532), (-17.37245141, -3.384907903))
            Line((-17.37245141, -3.384907903), (-20, -4.901923789))
            ThreePointArc((-20, -4.901923789), (-19.633974596, -4.535898385), (-19.5, -4.035898385))
            Line((-19.5, -4.035898385), (-19.5, 4.035898385))
            ThreePointArc((-19.5, 4.035898385), (-19.633974596, 4.535898385), (-20, 4.901923789))
        make_face()
    cut_extrude_6 = extrude(amount=-CUT_EXTRUDE_6_DEPTH, mode=Mode.SUBTRACT)

    # 镜向4: 切除-拉伸6 across plane
    add(cut_extrude_6.mirror(Plane(origin=(0, 0, 0), x_dir=(0, 0, 1), z_dir=(1, 0, 0))), mode=Mode.SUBTRACT)

    # 圆角4
    fillet_4_edges = [part.edges().sort_by_distance(p)[0] for p in [
        (21, 5.479274058, 0),
        (21, -5.479274058, 0),
        (-17.37245141, -3.384907903, 0),
        (-17.37245141, 3.384907903, 0),
        (17.37245141, 3.384907903, 0),
        (17.37245141, -3.384907903, 0),
        (-21, -5.479274058, 0),
        (-21, 5.479274058, 0),
    ]]
    fillet(fillet_4_edges, radius=FILLET_4_R)


solid = part.part
